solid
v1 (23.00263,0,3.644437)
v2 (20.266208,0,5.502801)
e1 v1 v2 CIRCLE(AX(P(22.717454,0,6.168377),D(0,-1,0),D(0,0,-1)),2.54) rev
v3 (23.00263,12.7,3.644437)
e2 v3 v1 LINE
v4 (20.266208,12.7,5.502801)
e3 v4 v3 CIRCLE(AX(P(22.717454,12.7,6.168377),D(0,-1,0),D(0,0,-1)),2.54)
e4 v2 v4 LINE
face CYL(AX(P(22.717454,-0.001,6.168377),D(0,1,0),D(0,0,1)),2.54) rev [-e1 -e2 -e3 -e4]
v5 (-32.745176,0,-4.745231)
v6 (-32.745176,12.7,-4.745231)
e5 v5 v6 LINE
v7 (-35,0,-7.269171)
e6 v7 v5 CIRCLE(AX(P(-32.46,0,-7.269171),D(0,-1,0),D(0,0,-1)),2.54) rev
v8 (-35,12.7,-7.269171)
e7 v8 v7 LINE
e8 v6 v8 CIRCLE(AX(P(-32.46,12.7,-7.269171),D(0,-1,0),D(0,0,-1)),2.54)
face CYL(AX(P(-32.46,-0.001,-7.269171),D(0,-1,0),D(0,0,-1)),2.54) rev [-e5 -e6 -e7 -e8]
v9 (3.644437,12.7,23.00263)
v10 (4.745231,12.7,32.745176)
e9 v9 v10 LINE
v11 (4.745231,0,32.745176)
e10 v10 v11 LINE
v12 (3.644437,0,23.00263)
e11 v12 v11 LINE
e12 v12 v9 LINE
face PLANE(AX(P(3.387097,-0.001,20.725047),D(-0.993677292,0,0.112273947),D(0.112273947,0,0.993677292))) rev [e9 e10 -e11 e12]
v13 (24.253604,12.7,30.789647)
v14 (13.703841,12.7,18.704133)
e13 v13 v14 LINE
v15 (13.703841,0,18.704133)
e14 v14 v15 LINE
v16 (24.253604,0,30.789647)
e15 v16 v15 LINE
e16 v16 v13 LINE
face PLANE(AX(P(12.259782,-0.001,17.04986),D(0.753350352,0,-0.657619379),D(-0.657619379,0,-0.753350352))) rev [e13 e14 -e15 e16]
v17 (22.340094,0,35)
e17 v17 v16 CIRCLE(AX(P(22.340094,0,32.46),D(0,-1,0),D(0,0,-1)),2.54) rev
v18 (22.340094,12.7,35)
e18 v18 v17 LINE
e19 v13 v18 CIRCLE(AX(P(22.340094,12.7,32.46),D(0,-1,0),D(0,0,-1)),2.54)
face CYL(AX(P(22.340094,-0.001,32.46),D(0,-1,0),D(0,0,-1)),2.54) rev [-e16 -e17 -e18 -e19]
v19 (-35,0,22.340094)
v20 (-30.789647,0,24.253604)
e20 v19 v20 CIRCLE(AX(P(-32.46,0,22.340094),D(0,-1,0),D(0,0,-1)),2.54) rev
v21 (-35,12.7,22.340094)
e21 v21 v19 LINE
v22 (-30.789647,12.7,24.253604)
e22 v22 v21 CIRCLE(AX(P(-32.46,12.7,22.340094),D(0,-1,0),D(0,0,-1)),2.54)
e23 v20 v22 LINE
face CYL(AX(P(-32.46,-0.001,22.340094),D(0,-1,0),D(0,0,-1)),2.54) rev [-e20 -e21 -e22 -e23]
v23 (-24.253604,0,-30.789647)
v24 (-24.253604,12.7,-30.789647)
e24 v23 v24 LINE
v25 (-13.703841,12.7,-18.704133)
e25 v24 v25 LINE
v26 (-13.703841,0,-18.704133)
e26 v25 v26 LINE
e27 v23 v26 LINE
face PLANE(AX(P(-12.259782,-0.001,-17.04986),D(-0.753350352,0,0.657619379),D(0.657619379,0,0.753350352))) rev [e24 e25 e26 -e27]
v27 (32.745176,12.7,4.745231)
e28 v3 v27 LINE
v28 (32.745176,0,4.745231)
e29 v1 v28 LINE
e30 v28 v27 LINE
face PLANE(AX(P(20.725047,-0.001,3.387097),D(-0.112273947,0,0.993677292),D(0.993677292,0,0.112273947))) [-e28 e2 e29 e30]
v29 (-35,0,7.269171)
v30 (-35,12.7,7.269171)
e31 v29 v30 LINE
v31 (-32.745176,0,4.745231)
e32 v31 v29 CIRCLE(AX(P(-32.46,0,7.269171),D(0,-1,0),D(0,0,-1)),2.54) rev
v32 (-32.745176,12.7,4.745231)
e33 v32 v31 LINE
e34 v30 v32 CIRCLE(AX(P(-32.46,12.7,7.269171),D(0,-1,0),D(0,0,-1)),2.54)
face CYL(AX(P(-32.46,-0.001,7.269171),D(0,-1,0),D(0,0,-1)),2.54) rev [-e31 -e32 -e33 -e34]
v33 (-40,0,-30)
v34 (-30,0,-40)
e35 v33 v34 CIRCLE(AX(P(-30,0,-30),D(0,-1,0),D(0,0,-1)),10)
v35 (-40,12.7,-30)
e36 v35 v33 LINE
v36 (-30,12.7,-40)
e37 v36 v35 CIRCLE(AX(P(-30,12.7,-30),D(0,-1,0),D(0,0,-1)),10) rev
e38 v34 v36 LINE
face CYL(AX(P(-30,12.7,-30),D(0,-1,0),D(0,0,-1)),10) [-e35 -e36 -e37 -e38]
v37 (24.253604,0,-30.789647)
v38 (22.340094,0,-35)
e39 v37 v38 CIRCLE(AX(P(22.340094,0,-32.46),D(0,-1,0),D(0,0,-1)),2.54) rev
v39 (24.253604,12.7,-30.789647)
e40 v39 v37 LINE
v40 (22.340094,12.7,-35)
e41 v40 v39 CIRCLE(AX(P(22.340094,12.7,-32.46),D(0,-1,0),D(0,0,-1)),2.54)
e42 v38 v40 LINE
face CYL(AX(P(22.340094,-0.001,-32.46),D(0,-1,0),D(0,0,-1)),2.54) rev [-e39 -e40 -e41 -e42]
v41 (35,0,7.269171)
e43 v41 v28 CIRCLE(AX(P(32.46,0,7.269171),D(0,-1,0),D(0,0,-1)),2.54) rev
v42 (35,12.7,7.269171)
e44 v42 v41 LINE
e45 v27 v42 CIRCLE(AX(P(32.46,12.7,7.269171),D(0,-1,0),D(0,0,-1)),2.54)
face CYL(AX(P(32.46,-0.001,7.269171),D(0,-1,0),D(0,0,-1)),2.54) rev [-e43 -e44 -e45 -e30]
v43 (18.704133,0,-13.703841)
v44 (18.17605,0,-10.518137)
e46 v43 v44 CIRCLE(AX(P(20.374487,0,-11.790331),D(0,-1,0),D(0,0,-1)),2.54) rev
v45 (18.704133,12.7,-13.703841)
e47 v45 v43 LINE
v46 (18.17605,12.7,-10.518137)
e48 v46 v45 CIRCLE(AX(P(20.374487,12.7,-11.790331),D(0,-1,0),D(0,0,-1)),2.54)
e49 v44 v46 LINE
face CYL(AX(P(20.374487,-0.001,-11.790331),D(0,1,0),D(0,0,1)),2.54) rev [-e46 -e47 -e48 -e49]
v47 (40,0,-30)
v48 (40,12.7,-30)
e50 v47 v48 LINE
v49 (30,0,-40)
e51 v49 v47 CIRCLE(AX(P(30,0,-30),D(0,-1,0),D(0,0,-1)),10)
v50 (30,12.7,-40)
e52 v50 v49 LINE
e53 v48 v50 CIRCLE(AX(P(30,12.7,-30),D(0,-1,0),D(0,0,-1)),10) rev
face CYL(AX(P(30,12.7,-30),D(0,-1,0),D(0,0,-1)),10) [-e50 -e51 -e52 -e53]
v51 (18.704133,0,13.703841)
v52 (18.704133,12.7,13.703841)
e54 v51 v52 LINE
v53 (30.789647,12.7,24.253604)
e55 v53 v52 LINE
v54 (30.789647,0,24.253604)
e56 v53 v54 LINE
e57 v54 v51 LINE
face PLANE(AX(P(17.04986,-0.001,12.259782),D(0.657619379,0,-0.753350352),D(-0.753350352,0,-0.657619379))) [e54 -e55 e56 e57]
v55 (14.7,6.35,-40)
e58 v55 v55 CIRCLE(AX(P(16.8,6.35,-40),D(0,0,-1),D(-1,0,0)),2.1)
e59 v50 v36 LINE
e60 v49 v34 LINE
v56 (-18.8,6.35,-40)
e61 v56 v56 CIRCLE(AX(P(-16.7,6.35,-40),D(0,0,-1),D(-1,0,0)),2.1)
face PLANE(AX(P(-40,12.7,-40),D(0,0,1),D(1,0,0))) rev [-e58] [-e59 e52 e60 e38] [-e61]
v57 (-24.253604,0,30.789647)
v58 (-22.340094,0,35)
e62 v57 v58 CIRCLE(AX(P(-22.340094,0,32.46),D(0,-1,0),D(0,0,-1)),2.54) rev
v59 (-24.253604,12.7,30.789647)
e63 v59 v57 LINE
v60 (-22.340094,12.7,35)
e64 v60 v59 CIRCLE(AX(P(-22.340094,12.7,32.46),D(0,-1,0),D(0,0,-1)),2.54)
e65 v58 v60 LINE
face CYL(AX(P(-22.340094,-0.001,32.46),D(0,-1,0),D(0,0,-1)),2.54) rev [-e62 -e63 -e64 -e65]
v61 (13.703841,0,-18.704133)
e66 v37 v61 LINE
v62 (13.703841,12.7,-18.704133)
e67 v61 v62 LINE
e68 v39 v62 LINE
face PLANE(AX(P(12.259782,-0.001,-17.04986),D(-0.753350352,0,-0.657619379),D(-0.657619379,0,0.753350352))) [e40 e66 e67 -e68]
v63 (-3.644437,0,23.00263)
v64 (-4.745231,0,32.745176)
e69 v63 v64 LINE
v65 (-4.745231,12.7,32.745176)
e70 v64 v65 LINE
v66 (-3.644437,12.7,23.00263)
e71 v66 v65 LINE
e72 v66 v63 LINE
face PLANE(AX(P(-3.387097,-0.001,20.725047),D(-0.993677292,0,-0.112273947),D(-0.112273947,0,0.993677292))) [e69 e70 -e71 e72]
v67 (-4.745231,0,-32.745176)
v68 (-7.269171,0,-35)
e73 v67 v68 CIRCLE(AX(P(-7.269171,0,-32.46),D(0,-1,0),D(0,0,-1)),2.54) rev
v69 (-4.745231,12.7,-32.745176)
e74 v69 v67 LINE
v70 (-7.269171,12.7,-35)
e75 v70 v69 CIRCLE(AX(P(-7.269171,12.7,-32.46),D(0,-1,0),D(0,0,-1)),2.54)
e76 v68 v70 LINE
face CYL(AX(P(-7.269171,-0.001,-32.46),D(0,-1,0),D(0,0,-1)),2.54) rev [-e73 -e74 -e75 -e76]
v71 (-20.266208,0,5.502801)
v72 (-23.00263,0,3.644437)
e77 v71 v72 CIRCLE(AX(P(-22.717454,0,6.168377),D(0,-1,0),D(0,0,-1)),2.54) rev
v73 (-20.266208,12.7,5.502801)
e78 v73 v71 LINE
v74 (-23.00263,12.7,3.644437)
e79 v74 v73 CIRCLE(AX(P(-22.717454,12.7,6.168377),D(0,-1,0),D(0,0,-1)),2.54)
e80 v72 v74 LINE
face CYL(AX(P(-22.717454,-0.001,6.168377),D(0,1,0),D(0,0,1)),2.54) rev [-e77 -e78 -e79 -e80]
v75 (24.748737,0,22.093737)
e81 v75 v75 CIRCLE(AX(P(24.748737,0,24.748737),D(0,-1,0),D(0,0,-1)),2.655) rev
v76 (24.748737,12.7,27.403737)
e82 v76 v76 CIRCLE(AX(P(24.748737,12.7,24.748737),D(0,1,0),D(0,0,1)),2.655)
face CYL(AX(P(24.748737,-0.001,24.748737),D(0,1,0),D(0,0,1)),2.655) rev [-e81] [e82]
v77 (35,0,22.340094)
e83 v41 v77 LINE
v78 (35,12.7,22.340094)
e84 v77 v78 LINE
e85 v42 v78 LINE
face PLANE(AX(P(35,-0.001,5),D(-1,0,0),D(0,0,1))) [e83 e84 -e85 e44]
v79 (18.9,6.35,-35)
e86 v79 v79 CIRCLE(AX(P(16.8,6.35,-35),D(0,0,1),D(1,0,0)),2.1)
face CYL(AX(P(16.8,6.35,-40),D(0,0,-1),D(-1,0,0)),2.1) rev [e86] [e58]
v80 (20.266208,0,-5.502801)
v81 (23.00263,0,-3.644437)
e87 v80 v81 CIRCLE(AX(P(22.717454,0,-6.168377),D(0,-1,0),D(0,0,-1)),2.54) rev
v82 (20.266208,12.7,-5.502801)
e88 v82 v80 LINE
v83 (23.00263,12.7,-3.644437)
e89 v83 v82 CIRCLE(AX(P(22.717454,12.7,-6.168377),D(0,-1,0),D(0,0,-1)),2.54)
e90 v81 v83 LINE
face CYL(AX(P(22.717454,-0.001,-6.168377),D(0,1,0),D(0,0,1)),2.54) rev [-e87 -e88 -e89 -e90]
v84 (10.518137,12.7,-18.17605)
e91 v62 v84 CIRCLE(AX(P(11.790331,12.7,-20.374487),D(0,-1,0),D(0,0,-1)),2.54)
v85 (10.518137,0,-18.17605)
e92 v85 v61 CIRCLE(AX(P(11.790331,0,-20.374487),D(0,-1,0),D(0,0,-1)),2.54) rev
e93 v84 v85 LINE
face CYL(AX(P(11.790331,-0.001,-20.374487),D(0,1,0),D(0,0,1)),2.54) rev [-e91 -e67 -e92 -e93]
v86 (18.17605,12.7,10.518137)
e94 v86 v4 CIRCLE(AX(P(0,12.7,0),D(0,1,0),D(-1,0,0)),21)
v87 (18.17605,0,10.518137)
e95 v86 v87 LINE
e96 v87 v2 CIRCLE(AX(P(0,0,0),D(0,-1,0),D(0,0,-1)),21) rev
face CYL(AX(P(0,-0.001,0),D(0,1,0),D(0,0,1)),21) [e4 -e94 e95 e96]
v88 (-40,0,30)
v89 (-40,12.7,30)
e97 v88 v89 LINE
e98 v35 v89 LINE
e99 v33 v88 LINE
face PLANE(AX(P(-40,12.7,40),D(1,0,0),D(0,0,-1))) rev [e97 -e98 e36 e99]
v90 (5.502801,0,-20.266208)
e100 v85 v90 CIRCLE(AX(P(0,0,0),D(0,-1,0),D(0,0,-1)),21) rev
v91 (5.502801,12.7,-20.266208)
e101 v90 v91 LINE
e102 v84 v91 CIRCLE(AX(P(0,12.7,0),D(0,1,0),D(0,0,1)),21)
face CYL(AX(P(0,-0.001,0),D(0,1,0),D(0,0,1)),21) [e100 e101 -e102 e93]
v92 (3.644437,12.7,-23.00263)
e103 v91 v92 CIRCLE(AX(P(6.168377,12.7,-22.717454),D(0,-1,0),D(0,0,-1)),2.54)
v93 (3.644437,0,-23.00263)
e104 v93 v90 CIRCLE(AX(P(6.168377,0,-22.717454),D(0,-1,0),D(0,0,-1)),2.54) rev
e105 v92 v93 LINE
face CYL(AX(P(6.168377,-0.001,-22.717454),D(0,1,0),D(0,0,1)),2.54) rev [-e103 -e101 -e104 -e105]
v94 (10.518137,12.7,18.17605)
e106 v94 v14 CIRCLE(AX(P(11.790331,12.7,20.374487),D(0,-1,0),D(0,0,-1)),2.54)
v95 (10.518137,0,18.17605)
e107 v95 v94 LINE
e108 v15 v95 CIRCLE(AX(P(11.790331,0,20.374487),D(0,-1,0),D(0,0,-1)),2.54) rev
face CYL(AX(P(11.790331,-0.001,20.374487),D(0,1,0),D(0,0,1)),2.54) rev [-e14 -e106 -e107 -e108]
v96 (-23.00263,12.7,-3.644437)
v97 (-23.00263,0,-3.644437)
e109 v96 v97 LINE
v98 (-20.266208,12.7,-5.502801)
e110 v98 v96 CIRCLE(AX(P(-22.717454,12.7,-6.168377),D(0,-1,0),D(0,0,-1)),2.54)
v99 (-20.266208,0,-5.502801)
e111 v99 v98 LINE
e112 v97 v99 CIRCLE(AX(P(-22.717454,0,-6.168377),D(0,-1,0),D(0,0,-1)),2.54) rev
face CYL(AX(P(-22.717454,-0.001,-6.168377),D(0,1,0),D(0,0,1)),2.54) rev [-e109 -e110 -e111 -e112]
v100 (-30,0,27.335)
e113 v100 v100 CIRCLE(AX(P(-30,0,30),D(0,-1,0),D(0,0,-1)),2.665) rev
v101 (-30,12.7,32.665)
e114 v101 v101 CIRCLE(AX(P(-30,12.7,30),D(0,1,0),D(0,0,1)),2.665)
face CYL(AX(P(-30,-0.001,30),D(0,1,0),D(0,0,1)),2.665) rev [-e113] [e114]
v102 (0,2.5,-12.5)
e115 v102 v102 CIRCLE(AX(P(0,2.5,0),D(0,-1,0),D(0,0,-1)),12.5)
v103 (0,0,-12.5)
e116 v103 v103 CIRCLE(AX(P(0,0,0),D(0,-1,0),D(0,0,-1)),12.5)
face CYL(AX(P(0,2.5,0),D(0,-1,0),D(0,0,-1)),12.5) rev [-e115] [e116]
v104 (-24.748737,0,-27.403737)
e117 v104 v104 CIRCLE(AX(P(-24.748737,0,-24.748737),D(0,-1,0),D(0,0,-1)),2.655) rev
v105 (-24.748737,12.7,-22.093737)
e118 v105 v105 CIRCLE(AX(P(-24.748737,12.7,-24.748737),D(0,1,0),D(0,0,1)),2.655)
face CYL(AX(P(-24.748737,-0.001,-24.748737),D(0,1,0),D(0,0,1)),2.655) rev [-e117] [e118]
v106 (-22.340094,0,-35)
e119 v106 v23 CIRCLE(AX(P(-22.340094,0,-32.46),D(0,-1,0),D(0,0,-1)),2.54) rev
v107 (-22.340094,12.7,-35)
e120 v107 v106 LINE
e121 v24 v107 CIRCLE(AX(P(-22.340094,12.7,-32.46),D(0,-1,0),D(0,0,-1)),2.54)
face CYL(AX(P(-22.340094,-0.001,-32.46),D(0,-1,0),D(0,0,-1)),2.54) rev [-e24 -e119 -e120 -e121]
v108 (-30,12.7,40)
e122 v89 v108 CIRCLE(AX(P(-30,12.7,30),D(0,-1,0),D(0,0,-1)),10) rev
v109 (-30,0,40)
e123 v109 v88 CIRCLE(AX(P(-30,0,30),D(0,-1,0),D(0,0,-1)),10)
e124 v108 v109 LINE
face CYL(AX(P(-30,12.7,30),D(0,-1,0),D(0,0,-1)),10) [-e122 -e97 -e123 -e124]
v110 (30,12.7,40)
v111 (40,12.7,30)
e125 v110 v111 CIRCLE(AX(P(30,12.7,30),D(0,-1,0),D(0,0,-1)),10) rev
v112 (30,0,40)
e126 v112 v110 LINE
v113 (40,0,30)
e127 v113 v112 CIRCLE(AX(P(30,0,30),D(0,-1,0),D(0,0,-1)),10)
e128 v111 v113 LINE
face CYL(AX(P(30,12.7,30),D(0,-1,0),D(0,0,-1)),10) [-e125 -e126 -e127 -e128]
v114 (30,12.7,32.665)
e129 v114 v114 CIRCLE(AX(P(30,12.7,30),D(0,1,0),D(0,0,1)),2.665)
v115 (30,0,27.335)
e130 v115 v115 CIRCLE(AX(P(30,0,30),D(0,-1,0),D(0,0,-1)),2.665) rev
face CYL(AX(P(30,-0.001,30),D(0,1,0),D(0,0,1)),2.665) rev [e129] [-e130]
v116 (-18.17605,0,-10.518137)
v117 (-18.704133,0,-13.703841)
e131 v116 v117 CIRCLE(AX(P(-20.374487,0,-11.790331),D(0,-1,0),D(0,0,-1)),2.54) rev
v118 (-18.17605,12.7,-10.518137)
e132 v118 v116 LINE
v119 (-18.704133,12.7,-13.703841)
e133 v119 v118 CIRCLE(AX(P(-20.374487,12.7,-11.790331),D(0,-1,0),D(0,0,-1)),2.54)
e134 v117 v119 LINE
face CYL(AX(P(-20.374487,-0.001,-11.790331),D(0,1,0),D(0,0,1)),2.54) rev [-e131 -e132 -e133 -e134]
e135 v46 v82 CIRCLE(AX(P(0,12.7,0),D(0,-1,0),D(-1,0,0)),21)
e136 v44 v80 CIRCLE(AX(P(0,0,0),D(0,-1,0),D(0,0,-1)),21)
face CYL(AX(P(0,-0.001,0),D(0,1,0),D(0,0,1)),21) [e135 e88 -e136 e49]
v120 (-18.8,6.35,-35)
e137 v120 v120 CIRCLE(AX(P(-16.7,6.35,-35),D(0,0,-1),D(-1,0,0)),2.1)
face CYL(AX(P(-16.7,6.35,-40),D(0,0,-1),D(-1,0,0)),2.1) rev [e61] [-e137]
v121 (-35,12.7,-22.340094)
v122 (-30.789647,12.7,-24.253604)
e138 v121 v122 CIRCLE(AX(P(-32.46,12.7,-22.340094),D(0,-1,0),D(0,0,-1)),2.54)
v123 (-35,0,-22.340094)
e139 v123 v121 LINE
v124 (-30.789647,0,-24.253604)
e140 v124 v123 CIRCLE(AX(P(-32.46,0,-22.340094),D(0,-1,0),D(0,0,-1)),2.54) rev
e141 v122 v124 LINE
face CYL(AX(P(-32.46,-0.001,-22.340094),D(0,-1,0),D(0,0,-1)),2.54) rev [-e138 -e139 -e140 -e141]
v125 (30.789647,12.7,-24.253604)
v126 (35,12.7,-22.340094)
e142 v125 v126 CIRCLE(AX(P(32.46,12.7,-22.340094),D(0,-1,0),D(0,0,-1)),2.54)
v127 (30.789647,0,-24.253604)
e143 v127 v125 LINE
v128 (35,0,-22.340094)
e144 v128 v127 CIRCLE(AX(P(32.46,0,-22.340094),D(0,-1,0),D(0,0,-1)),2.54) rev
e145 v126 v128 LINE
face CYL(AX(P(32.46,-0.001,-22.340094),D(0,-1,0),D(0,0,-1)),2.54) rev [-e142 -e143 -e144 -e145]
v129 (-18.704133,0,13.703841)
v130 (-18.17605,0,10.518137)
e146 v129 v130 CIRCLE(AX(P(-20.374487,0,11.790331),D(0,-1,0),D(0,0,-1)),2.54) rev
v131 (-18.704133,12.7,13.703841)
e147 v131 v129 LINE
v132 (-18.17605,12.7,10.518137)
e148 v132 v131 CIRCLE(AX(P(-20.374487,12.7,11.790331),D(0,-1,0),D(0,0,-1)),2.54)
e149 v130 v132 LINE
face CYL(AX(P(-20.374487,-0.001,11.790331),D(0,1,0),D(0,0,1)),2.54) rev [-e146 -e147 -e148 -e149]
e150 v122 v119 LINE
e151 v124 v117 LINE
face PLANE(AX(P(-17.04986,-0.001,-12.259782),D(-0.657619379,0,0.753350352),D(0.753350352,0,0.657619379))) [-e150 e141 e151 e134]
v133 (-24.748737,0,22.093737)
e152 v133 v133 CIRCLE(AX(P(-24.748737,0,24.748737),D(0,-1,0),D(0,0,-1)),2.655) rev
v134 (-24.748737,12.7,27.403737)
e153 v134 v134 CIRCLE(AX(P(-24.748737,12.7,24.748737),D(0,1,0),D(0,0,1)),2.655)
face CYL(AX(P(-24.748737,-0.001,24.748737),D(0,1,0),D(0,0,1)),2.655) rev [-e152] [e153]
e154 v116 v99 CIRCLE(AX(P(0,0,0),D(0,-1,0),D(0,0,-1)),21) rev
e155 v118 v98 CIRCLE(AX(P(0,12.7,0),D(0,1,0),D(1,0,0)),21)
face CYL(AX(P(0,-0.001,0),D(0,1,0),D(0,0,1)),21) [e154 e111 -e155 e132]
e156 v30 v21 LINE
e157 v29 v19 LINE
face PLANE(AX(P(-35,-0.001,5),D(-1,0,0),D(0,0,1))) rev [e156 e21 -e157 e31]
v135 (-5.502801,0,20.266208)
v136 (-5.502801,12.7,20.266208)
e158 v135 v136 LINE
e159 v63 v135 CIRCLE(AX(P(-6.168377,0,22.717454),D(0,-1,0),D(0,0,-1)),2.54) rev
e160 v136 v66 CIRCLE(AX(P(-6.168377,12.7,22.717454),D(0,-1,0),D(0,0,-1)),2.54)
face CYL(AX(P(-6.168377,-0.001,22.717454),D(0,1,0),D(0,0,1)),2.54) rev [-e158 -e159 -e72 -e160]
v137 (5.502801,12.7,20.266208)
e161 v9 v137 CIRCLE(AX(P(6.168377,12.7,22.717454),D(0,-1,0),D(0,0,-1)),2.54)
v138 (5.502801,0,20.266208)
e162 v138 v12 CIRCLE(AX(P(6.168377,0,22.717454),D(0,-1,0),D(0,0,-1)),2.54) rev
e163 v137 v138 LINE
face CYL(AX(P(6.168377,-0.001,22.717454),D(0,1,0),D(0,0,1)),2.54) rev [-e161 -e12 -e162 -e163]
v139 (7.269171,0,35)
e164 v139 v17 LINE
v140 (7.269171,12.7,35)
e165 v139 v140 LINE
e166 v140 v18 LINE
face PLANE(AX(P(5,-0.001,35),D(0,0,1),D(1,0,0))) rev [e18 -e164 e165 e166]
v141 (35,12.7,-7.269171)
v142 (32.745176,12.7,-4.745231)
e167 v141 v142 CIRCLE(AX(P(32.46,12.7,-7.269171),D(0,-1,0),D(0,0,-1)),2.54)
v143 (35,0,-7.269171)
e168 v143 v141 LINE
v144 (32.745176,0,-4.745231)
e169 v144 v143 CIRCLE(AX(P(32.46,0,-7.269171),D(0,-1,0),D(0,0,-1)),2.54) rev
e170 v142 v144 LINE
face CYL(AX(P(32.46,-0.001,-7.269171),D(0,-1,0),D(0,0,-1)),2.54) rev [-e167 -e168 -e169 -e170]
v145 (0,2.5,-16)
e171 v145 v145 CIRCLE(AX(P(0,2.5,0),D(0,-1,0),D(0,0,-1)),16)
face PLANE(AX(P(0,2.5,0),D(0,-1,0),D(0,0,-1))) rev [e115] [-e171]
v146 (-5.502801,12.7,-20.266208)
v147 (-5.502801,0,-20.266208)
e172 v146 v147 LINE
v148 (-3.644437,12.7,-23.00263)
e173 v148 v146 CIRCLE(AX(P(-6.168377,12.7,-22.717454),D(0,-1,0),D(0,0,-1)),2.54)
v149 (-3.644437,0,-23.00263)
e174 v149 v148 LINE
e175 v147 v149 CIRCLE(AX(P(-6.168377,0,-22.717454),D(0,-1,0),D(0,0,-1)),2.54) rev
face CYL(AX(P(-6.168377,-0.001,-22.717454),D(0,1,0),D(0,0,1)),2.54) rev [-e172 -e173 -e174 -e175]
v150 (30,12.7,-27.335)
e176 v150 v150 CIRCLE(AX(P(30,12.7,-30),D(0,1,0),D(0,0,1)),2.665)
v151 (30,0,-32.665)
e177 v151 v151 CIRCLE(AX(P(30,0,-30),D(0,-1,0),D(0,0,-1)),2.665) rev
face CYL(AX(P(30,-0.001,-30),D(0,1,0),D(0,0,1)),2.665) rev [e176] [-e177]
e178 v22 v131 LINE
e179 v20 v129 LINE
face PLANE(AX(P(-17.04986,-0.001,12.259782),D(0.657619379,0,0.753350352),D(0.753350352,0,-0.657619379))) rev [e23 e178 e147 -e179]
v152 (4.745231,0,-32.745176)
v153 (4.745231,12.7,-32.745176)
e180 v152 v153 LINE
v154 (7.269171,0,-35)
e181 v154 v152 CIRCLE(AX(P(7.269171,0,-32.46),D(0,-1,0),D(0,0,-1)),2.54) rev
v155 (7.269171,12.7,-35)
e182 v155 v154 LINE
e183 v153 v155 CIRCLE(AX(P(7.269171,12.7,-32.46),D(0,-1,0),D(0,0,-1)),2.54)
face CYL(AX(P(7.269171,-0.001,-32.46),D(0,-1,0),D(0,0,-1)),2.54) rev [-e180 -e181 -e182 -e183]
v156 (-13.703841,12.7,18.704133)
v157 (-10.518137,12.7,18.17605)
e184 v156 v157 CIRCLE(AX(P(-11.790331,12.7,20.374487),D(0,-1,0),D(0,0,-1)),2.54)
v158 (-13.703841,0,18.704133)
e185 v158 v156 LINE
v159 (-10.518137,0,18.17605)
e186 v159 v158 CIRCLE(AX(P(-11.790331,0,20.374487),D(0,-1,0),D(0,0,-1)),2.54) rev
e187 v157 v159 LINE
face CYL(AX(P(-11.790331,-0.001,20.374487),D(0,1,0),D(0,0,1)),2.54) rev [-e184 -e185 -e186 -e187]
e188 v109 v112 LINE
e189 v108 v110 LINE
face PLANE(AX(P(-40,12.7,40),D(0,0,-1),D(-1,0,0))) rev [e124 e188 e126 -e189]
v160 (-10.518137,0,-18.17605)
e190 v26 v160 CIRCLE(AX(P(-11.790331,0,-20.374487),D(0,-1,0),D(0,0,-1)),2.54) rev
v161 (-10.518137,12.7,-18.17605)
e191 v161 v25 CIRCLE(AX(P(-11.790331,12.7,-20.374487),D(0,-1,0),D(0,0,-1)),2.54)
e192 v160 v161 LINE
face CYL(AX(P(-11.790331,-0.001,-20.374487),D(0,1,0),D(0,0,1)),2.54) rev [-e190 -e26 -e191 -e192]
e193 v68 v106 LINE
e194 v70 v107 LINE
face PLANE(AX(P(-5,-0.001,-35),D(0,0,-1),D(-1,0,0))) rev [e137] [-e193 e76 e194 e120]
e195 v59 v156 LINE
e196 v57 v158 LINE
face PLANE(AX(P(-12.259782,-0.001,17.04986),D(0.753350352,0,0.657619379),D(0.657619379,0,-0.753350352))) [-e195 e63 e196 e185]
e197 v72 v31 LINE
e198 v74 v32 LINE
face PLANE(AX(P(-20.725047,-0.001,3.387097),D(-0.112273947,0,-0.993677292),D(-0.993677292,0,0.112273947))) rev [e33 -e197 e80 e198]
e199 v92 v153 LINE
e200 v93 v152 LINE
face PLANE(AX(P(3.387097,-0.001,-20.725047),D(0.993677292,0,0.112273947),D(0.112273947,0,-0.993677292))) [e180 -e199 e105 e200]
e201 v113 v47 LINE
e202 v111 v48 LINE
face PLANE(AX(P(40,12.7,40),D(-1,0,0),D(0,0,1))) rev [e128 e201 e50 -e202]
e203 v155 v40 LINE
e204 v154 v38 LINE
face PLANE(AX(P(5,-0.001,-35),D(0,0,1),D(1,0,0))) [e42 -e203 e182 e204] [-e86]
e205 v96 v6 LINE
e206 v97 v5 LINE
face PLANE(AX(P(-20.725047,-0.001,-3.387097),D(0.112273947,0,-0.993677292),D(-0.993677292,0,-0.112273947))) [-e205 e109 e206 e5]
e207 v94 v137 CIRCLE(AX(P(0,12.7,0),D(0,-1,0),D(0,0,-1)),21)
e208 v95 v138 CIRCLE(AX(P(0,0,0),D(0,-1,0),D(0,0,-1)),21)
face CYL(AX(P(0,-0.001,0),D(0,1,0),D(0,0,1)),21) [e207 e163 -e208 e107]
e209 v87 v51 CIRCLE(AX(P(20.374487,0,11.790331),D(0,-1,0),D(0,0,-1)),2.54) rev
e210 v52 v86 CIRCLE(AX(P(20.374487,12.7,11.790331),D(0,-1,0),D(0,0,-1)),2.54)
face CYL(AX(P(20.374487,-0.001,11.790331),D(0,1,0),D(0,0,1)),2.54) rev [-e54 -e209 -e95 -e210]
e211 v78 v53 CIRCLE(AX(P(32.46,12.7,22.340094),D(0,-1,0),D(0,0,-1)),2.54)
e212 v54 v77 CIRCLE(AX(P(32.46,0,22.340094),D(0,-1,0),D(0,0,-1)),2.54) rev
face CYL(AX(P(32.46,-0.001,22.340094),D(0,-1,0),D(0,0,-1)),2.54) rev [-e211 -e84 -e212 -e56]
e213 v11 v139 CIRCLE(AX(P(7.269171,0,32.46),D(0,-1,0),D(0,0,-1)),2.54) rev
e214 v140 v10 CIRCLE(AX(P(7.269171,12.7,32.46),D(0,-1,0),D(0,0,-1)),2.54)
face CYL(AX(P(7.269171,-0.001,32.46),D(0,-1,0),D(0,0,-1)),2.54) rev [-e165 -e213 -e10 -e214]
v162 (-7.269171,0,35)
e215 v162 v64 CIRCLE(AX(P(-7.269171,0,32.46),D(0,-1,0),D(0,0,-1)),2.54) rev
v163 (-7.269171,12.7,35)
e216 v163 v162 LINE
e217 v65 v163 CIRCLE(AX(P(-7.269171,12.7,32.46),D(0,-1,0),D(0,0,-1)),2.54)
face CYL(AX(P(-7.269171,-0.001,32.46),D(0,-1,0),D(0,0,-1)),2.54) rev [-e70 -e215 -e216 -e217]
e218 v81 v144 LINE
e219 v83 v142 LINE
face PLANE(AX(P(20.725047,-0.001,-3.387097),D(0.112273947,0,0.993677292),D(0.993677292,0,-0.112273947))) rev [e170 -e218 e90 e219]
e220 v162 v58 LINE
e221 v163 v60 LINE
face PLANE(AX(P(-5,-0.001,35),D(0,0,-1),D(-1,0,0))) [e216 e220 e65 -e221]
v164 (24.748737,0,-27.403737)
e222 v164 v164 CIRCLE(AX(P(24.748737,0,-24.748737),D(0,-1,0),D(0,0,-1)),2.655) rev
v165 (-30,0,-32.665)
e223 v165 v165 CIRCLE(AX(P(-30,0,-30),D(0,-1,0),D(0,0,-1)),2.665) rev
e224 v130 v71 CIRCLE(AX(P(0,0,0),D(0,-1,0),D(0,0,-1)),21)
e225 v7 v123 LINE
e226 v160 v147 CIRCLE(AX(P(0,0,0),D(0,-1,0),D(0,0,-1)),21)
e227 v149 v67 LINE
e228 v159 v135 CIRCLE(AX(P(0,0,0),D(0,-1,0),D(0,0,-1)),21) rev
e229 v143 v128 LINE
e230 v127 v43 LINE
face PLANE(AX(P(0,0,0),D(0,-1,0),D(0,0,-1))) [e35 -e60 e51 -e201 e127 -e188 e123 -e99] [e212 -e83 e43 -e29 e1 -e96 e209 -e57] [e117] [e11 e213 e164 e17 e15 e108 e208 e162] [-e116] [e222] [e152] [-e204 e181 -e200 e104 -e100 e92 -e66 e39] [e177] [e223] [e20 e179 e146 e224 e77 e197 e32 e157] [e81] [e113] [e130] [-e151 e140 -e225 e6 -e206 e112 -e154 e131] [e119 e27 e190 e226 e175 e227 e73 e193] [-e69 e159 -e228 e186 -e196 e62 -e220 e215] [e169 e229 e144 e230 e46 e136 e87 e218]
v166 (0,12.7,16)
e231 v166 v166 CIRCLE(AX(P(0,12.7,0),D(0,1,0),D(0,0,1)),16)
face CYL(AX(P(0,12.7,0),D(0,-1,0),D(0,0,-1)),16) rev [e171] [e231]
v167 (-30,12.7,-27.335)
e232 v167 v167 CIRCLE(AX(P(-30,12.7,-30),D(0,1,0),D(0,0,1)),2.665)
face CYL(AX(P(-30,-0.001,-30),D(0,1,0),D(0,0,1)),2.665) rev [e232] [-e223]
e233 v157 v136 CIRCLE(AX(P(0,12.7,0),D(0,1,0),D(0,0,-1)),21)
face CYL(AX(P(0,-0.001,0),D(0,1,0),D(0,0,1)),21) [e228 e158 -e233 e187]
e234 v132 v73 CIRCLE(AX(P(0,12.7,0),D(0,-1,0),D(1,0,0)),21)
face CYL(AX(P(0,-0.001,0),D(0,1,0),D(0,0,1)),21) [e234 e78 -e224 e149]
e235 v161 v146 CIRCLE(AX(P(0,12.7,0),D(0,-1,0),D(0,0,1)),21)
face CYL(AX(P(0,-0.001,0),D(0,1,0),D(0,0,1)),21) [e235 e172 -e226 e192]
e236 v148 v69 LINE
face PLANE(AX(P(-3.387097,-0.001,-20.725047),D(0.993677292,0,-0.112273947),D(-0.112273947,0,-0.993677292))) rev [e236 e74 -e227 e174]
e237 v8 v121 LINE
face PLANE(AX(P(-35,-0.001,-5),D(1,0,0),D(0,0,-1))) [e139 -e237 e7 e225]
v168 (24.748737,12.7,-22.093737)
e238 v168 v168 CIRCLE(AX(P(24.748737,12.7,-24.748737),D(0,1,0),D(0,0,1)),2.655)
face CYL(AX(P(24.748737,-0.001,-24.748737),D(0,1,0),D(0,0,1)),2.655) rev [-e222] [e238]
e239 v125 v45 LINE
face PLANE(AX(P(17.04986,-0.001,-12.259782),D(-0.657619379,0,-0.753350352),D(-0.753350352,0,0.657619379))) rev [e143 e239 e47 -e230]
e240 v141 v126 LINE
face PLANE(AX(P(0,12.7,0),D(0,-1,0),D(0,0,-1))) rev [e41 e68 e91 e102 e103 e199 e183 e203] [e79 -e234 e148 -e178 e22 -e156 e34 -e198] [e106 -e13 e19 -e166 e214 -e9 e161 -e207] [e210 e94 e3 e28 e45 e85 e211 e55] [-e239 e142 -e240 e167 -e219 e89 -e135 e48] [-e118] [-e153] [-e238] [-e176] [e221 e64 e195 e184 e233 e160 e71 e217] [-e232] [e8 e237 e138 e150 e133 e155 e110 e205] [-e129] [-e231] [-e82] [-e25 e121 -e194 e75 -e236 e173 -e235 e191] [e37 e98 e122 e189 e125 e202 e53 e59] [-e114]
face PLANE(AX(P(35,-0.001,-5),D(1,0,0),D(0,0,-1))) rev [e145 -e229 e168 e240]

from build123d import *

# Parameters (mm, degrees)
SKETCH1_W                 = 80
SKETCH1_H                 = 80
SKETCH1_R                 = 16
BOSS_EXTRUDE1_DEPTH       = 12.7
CUT_EXTRUDE1_REACH        = 59.977
SKETCH2_R                 = 2.655
FILLET1_R                 = 10
CUT_EXTRUDE2_REACH        = 59.977
SKETCH3_R                 = 2.665
CUT_EXTRUDE3_REACH        = 59.977
FILLET2_R                 = 2.54
FILLET2_OF_MIRROR1_R      = 2.54
CIRPATTERN1_DEPTH         = 12.7
M5X0_8_TAPPED_HOLE1_D     = 4.2
M5X0_8_TAPPED_HOLE1_DEPTH = 5
SKETCH7_R                 = 16
SKETCH7_R_2               = 12.5
BOSS_EXTRUDE2_DEPTH       = 2.5


# Read off the part's stored shape, not the designer's step: CirPattern1
with BuildPart() as part:
    # Sketch1 → Boss-Extrude1 (new body)
    with BuildSketch(Plane(origin=(0, 0, 0), x_dir=(1, 0, 0), z_dir=(0, 1, 0))):
        Rectangle(SKETCH1_W, SKETCH1_H)
        with Locations(Location((0, 0, 0), (0, 0, 270))):
            Circle(SKETCH1_R, mode=Mode.SUBTRACT)
    extrude(amount=BOSS_EXTRUDE1_DEPTH)

    # Sketch2 → Cut-Extrude1 (cut, up to next)
    with BuildSketch(Plane(origin=(0, 12.7, 0), x_dir=(1, 0, 0), z_dir=(0, 1, 0)), mode=Mode.PRIVATE) as cut_extrude1_sk1:
        with Locations(Location((24.748737342, 24.748737342, 0), (0, 0, 270))):
            Circle(SKETCH2_R)
    cut_extrude1_tool1 = extrude(cut_extrude1_sk1.sketch, amount=-CUT_EXTRUDE1_REACH, mode=Mode.PRIVATE) & part.part
    # Sketch2 → Cut-Extrude1 (cut, up to next)
    with BuildSketch(Plane(origin=(0, 12.7, 0), x_dir=(1, 0, 0), z_dir=(0, 1, 0)), mode=Mode.PRIVATE) as cut_extrude1_sk2:
        with Locations(Location((-24.748737342, 24.748737342, 0), (0, 0, 270))):
            Circle(SKETCH2_R)
    cut_extrude1_tool2 = extrude(cut_extrude1_sk2.sketch, amount=-CUT_EXTRUDE1_REACH, mode=Mode.PRIVATE) & part.part
    # Sketch2 → Cut-Extrude1 (cut, up to next)
    with BuildSketch(Plane(origin=(0, 12.7, 0), x_dir=(1, 0, 0), z_dir=(0, 1, 0)), mode=Mode.PRIVATE) as cut_extrude1_sk3:
        with Locations(Location((24.748737342, -24.748737342, 0), (0, 0, 270))):
            Circle(SKETCH2_R)
    cut_extrude1_tool3 = extrude(cut_extrude1_sk3.sketch, amount=-CUT_EXTRUDE1_REACH, mode=Mode.PRIVATE) & part.part
    # Sketch2 → Cut-Extrude1 (cut, up to next)
    with BuildSketch(Plane(origin=(0, 12.7, 0), x_dir=(1, 0, 0), z_dir=(0, 1, 0)), mode=Mode.PRIVATE) as cut_extrude1_sk4:
        with Locations(Location((-24.748737342, -24.748737342, 0), (0, 0, 270))):
            Circle(SKETCH2_R)
    cut_extrude1_tool4 = extrude(cut_extrude1_sk4.sketch, amount=-CUT_EXTRUDE1_REACH, mode=Mode.PRIVATE) & part.part
    add(cut_extrude1_tool1.solids().sort_by_distance((24.748737, 12.7, -24.748737))[0], mode=Mode.SUBTRACT)
    add(cut_extrude1_tool2.solids().sort_by_distance((-24.748737, 12.7, -24.748737))[0], mode=Mode.SUBTRACT)
    add(cut_extrude1_tool3.solids().sort_by_distance((24.748737, 12.7, 24.748737))[0], mode=Mode.SUBTRACT)
    add(cut_extrude1_tool4.solids().sort_by_distance((-24.748737, 12.7, 24.748737))[0], mode=Mode.SUBTRACT)

    # Fillet1
    fillet1_edges = [part.edges().sort_by_distance(p)[0] for p in [
        (40, 6.35, 40),
        (-40, 6.35, 40),
        (-40, 6.35, -40),
        (40, 6.35, -40),
    ]]
    fillet(fillet1_edges, radius=FILLET1_R)

    # Sketch3 → Cut-Extrude2 (cut, up to next)
    with BuildSketch(Plane(origin=(0, 12.7, 0), x_dir=(1, 0, 0), z_dir=(0, 1, 0)), mode=Mode.PRIVATE) as cut_extrude2_sk1:
        with Locations(Location((-30, 30, 0), (0, 0, 270))):
            Circle(SKETCH3_R)
    cut_extrude2_tool1 = extrude(cut_extrude2_sk1.sketch, amount=-CUT_EXTRUDE2_REACH, mode=Mode.PRIVATE) & part.part
    # Sketch3 → Cut-Extrude2 (cut, up to next)
    with BuildSketch(Plane(origin=(0, 12.7, 0), x_dir=(1, 0, 0), z_dir=(0, 1, 0)), mode=Mode.PRIVATE) as cut_extrude2_sk2:
        with Locations(Location((30, 30, 0), (0, 0, 270))):
            Circle(SKETCH3_R)
    cut_extrude2_tool2 = extrude(cut_extrude2_sk2.sketch, amount=-CUT_EXTRUDE2_REACH, mode=Mode.PRIVATE) & part.part
    # Sketch3 → Cut-Extrude2 (cut, up to next)
    with BuildSketch(Plane(origin=(0, 12.7, 0), x_dir=(1, 0, 0), z_dir=(0, 1, 0)), mode=Mode.PRIVATE) as cut_extrude2_sk3:
        with Locations(Location((30, -30, 0), (0, 0, 270))):
            Circle(SKETCH3_R)
    cut_extrude2_tool3 = extrude(cut_extrude2_sk3.sketch, amount=-CUT_EXTRUDE2_REACH, mode=Mode.PRIVATE) & part.part
    # Sketch3 → Cut-Extrude2 (cut, up to next)
    with BuildSketch(Plane(origin=(0, 12.7, 0), x_dir=(1, 0, 0), z_dir=(0, 1, 0)), mode=Mode.PRIVATE) as cut_extrude2_sk4:
        with Locations(Location((-30, -30, 0), (0, 0, 270))):
            Circle(SKETCH3_R)
    cut_extrude2_tool4 = extrude(cut_extrude2_sk4.sketch, amount=-CUT_EXTRUDE2_REACH, mode=Mode.PRIVATE) & part.part
    add(cut_extrude2_tool1.solids().sort_by_distance((-30, 12.7, -30))[0], mode=Mode.SUBTRACT)
    add(cut_extrude2_tool2.solids().sort_by_distance((30, 12.7, -30))[0], mode=Mode.SUBTRACT)
    add(cut_extrude2_tool3.solids().sort_by_distance((30, 12.7, 30))[0], mode=Mode.SUBTRACT)
    add(cut_extrude2_tool4.solids().sort_by_distance((-30, 12.7, 30))[0], mode=Mode.SUBTRACT)

    # Sketch4 → Cut-Extrude3 (cut, up to next)
    with BuildSketch(Plane(origin=(0, 12.7, 0), x_dir=(1, 0, 0), z_dir=(0, 1, 0)), mode=Mode.PRIVATE) as cut_extrude3_sk1:
        with BuildLine():
            Line((-5, 35), (-27.928932188, 35))
            Line((-27.928932188, 35), (-12.259782216, 17.049860411))
            ThreePointArc((-12.259782216, 17.049860411), (-8.03635208, 19.401470183), (-3.387096774, 20.725047055))
            Line((-3.387096774, 20.725047055), (-5, 35))
        make_face()
    cut_extrude3_tool1 = extrude(cut_extrude3_sk1.sketch, amount=-CUT_EXTRUDE3_REACH, mode=Mode.PRIVATE) & part.part
    cut_extrude3 = cut_extrude3_tool1.solids().sort_by_distance((-13.138354, 12.7, -27.973836))[0]
    add(cut_extrude3, mode=Mode.SUBTRACT)

    # Fillet2
    fillet2_edges = [part.edges().sort_by_distance(p)[0] for p in [
        (-12.259782216, 6.35, -17.049860411),
        (-27.928932188, 6.35, -35),
        (-5, 6.35, -35),
        (-3.387096774, 6.35, -20.725047055),
    ]]
    fillet(fillet2_edges, radius=FILLET2_R)

    # Mirror1: Cut-Extrude3 across plane
    add(cut_extrude3.mirror(Plane(origin=(0, 0, 0), x_dir=(0, 0, 1), z_dir=(1, 0, 0))), mode=Mode.SUBTRACT)

    # Fillet2 of Mirror1
    fillet2_of_mirror1_edges = [part.edges().sort_by_distance(p)[0] for p in [
        (12.259782216, 6.35, -17.049860411),
        (27.928932188, 6.35, -35),
        (5, 6.35, -35),
        (3.387096774, 6.35, -20.725047055),
    ]]
    fillet(fillet2_of_mirror1_edges, radius=FILLET2_OF_MIRROR1_R)

    # CirPattern1 outline → CirPattern1 (cut)
    with BuildSketch(Plane(origin=(0, 0, 0), x_dir=(1, 0, 0), z_dir=(0, 1, 0))):
        with BuildLine():
            ThreePointArc((18.176050002, 10.518137018), (19.384019181, 8.078353817), (20.26620798, 5.50280057))
            ThreePointArc((20.26620798, 5.50280057), (21.29044889, 4.067126305), (23.002629913, 3.644437079))
            Line((23.002629913, 3.644437079), (32.745175825, 4.745231161))
            ThreePointArc((32.745175825, 4.745231161), (34.35419463, 5.576946113), (35, 7.269171483))
            Line((35, 7.269171483), (35, 22.340093991))
            ThreePointArc((35, 22.340093991), (33.510928831, 24.652484225), (30.789646778, 24.253603885))
            Line((30.789646778, 24.253603885), (18.704133304, 13.703840627))
            ThreePointArc((18.704133304, 13.703840627), (17.868681187, 12.205709601), (18.176050002, 10.518137018))
        make_face()
        with BuildLine():
            ThreePointArc((-18.176050002, -10.518137018), (-19.384019181, -8.078353817), (-20.26620798, -5.50280057))
            ThreePointArc((-20.26620798, -5.50280057), (-21.29044889, -4.067126305), (-23.002629913, -3.644437079))
            Line((-23.002629913, -3.644437079), (-32.745175825, -4.745231161))
            ThreePointArc((-32.745175825, -4.745231161), (-34.35419463, -5.576946113), (-35, -7.269171483))
            Line((-35, -7.269171483), (-35, -22.340093991))
            ThreePointArc((-35, -22.340093991), (-33.510928831, -24.652484225), (-30.789646778, -24.253603885))
            Line((-30.789646778, -24.253603885), (-18.704133304, -13.703840627))
            ThreePointArc((-18.704133304, -13.703840627), (-17.868681187, -12.205709601), (-18.176050002, -10.518137018))
        make_face()
        with BuildLine():
            ThreePointArc((10.518137018, -18.176050002), (8.078353817, -19.384019181), (5.50280057, -20.26620798))
            ThreePointArc((5.50280057, -20.26620798), (4.067126305, -21.29044889), (3.644437079, -23.002629913))
            Line((3.644437079, -23.002629913), (4.745231161, -32.745175825))
            ThreePointArc((4.745231161, -32.745175825), (5.576946113, -34.35419463), (7.269171483, -35))
            Line((7.269171483, -35), (22.340093991, -35))
            ThreePointArc((22.340093991, -35), (24.652484225, -33.510928831), (24.253603885, -30.789646778))
            Line((24.253603885, -30.789646778), (13.703840627, -18.704133304))
            ThreePointArc((13.703840627, -18.704133304), (12.205709601, -17.868681187), (10.518137018, -18.176050002))
        make_face()
        with BuildLine():
            ThreePointArc((20.26620798, -5.50280057), (19.384019181, -8.078353817), (18.176050002, -10.518137018))
            ThreePointArc((18.176050002, -10.518137018), (17.868681187, -12.205709601), (18.704133304, -13.703840627))
            Line((18.704133304, -13.703840627), (30.789646778, -24.253603885))
            ThreePointArc((30.789646778, -24.253603885), (33.510928831, -24.652484225), (35, -22.340093991))
            Line((35, -22.340093991), (35, -7.269171483))
            ThreePointArc((35, -7.269171483), (34.35419463, -5.576946113), (32.745175825, -4.745231161))
            Line((32.745175825, -4.745231161), (23.002629913, -3.644437079))
            ThreePointArc((23.002629913, -3.644437079), (21.29044889, -4.067126305), (20.26620798, -5.50280057))
        make_face()
        with BuildLine():
            ThreePointArc((-5.50280057, -20.26620798), (-8.078353817, -19.384019181), (-10.518137018, -18.176050002))
            ThreePointArc((-10.518137018, -18.176050002), (-12.205709601, -17.868681187), (-13.703840627, -18.704133304))
            Line((-13.703840627, -18.704133304), (-24.253603885, -30.789646778))
            ThreePointArc((-24.253603885, -30.789646778), (-24.652484225, -33.510928831), (-22.340093991, -35))
            Line((-22.340093991, -35), (-7.269171483, -35))
            ThreePointArc((-7.269171483, -35), (-5.576946113, -34.35419463), (-4.745231161, -32.745175825))
            Line((-4.745231161, -32.745175825), (-3.644437079, -23.002629913))
            ThreePointArc((-3.644437079, -23.002629913), (-4.067126305, -21.29044889), (-5.50280057, -20.26620798))
        make_face()
        with BuildLine():
            ThreePointArc((-20.26620798, 5.50280057), (-19.384019181, 8.078353817), (-18.176050002, 10.518137018))
            ThreePointArc((-18.176050002, 10.518137018), (-17.868681187, 12.205709601), (-18.704133304, 13.703840627))
            Line((-18.704133304, 13.703840627), (-30.789646778, 24.253603885))
            ThreePointArc((-30.789646778, 24.253603885), (-33.510928831, 24.652484225), (-35, 22.340093991))
            Line((-35, 22.340093991), (-35, 7.269171483))
            ThreePointArc((-35, 7.269171483), (-34.35419463, 5.576946113), (-32.745175825, 4.745231161))
            Line((-32.745175825, 4.745231161), (-23.002629913, 3.644437079))
            ThreePointArc((-23.002629913, 3.644437079), (-21.29044889, 4.067126305), (-20.26620798, 5.50280057))
        make_face()
    extrude(amount=CIRPATTERN1_DEPTH, mode=Mode.SUBTRACT)

    # M5x0.8 Tapped Hole1
    with Locations(Plane(origin=(-16.7, 6.35, -40), x_dir=(-1, 0, 0), z_dir=(0, 0, -1))):
        with Locations((0, 0), (-33.5, 0)):
            Hole(M5X0_8_TAPPED_HOLE1_D / 2, depth=M5X0_8_TAPPED_HOLE1_DEPTH)

    # Sketch7 → Boss-Extrude2 (add)
    with BuildSketch(Plane.XZ):
        with Locations(Location((0, 0, 0), (0, 0, 270))):
            Circle(SKETCH7_R)
        with Locations(Location((0, 0, 0), (0, 0, 270))):
            Circle(SKETCH7_R_2, mode=Mode.SUBTRACT)
    extrude(amount=-BOSS_EXTRUDE2_DEPTH)


solid = part.part
